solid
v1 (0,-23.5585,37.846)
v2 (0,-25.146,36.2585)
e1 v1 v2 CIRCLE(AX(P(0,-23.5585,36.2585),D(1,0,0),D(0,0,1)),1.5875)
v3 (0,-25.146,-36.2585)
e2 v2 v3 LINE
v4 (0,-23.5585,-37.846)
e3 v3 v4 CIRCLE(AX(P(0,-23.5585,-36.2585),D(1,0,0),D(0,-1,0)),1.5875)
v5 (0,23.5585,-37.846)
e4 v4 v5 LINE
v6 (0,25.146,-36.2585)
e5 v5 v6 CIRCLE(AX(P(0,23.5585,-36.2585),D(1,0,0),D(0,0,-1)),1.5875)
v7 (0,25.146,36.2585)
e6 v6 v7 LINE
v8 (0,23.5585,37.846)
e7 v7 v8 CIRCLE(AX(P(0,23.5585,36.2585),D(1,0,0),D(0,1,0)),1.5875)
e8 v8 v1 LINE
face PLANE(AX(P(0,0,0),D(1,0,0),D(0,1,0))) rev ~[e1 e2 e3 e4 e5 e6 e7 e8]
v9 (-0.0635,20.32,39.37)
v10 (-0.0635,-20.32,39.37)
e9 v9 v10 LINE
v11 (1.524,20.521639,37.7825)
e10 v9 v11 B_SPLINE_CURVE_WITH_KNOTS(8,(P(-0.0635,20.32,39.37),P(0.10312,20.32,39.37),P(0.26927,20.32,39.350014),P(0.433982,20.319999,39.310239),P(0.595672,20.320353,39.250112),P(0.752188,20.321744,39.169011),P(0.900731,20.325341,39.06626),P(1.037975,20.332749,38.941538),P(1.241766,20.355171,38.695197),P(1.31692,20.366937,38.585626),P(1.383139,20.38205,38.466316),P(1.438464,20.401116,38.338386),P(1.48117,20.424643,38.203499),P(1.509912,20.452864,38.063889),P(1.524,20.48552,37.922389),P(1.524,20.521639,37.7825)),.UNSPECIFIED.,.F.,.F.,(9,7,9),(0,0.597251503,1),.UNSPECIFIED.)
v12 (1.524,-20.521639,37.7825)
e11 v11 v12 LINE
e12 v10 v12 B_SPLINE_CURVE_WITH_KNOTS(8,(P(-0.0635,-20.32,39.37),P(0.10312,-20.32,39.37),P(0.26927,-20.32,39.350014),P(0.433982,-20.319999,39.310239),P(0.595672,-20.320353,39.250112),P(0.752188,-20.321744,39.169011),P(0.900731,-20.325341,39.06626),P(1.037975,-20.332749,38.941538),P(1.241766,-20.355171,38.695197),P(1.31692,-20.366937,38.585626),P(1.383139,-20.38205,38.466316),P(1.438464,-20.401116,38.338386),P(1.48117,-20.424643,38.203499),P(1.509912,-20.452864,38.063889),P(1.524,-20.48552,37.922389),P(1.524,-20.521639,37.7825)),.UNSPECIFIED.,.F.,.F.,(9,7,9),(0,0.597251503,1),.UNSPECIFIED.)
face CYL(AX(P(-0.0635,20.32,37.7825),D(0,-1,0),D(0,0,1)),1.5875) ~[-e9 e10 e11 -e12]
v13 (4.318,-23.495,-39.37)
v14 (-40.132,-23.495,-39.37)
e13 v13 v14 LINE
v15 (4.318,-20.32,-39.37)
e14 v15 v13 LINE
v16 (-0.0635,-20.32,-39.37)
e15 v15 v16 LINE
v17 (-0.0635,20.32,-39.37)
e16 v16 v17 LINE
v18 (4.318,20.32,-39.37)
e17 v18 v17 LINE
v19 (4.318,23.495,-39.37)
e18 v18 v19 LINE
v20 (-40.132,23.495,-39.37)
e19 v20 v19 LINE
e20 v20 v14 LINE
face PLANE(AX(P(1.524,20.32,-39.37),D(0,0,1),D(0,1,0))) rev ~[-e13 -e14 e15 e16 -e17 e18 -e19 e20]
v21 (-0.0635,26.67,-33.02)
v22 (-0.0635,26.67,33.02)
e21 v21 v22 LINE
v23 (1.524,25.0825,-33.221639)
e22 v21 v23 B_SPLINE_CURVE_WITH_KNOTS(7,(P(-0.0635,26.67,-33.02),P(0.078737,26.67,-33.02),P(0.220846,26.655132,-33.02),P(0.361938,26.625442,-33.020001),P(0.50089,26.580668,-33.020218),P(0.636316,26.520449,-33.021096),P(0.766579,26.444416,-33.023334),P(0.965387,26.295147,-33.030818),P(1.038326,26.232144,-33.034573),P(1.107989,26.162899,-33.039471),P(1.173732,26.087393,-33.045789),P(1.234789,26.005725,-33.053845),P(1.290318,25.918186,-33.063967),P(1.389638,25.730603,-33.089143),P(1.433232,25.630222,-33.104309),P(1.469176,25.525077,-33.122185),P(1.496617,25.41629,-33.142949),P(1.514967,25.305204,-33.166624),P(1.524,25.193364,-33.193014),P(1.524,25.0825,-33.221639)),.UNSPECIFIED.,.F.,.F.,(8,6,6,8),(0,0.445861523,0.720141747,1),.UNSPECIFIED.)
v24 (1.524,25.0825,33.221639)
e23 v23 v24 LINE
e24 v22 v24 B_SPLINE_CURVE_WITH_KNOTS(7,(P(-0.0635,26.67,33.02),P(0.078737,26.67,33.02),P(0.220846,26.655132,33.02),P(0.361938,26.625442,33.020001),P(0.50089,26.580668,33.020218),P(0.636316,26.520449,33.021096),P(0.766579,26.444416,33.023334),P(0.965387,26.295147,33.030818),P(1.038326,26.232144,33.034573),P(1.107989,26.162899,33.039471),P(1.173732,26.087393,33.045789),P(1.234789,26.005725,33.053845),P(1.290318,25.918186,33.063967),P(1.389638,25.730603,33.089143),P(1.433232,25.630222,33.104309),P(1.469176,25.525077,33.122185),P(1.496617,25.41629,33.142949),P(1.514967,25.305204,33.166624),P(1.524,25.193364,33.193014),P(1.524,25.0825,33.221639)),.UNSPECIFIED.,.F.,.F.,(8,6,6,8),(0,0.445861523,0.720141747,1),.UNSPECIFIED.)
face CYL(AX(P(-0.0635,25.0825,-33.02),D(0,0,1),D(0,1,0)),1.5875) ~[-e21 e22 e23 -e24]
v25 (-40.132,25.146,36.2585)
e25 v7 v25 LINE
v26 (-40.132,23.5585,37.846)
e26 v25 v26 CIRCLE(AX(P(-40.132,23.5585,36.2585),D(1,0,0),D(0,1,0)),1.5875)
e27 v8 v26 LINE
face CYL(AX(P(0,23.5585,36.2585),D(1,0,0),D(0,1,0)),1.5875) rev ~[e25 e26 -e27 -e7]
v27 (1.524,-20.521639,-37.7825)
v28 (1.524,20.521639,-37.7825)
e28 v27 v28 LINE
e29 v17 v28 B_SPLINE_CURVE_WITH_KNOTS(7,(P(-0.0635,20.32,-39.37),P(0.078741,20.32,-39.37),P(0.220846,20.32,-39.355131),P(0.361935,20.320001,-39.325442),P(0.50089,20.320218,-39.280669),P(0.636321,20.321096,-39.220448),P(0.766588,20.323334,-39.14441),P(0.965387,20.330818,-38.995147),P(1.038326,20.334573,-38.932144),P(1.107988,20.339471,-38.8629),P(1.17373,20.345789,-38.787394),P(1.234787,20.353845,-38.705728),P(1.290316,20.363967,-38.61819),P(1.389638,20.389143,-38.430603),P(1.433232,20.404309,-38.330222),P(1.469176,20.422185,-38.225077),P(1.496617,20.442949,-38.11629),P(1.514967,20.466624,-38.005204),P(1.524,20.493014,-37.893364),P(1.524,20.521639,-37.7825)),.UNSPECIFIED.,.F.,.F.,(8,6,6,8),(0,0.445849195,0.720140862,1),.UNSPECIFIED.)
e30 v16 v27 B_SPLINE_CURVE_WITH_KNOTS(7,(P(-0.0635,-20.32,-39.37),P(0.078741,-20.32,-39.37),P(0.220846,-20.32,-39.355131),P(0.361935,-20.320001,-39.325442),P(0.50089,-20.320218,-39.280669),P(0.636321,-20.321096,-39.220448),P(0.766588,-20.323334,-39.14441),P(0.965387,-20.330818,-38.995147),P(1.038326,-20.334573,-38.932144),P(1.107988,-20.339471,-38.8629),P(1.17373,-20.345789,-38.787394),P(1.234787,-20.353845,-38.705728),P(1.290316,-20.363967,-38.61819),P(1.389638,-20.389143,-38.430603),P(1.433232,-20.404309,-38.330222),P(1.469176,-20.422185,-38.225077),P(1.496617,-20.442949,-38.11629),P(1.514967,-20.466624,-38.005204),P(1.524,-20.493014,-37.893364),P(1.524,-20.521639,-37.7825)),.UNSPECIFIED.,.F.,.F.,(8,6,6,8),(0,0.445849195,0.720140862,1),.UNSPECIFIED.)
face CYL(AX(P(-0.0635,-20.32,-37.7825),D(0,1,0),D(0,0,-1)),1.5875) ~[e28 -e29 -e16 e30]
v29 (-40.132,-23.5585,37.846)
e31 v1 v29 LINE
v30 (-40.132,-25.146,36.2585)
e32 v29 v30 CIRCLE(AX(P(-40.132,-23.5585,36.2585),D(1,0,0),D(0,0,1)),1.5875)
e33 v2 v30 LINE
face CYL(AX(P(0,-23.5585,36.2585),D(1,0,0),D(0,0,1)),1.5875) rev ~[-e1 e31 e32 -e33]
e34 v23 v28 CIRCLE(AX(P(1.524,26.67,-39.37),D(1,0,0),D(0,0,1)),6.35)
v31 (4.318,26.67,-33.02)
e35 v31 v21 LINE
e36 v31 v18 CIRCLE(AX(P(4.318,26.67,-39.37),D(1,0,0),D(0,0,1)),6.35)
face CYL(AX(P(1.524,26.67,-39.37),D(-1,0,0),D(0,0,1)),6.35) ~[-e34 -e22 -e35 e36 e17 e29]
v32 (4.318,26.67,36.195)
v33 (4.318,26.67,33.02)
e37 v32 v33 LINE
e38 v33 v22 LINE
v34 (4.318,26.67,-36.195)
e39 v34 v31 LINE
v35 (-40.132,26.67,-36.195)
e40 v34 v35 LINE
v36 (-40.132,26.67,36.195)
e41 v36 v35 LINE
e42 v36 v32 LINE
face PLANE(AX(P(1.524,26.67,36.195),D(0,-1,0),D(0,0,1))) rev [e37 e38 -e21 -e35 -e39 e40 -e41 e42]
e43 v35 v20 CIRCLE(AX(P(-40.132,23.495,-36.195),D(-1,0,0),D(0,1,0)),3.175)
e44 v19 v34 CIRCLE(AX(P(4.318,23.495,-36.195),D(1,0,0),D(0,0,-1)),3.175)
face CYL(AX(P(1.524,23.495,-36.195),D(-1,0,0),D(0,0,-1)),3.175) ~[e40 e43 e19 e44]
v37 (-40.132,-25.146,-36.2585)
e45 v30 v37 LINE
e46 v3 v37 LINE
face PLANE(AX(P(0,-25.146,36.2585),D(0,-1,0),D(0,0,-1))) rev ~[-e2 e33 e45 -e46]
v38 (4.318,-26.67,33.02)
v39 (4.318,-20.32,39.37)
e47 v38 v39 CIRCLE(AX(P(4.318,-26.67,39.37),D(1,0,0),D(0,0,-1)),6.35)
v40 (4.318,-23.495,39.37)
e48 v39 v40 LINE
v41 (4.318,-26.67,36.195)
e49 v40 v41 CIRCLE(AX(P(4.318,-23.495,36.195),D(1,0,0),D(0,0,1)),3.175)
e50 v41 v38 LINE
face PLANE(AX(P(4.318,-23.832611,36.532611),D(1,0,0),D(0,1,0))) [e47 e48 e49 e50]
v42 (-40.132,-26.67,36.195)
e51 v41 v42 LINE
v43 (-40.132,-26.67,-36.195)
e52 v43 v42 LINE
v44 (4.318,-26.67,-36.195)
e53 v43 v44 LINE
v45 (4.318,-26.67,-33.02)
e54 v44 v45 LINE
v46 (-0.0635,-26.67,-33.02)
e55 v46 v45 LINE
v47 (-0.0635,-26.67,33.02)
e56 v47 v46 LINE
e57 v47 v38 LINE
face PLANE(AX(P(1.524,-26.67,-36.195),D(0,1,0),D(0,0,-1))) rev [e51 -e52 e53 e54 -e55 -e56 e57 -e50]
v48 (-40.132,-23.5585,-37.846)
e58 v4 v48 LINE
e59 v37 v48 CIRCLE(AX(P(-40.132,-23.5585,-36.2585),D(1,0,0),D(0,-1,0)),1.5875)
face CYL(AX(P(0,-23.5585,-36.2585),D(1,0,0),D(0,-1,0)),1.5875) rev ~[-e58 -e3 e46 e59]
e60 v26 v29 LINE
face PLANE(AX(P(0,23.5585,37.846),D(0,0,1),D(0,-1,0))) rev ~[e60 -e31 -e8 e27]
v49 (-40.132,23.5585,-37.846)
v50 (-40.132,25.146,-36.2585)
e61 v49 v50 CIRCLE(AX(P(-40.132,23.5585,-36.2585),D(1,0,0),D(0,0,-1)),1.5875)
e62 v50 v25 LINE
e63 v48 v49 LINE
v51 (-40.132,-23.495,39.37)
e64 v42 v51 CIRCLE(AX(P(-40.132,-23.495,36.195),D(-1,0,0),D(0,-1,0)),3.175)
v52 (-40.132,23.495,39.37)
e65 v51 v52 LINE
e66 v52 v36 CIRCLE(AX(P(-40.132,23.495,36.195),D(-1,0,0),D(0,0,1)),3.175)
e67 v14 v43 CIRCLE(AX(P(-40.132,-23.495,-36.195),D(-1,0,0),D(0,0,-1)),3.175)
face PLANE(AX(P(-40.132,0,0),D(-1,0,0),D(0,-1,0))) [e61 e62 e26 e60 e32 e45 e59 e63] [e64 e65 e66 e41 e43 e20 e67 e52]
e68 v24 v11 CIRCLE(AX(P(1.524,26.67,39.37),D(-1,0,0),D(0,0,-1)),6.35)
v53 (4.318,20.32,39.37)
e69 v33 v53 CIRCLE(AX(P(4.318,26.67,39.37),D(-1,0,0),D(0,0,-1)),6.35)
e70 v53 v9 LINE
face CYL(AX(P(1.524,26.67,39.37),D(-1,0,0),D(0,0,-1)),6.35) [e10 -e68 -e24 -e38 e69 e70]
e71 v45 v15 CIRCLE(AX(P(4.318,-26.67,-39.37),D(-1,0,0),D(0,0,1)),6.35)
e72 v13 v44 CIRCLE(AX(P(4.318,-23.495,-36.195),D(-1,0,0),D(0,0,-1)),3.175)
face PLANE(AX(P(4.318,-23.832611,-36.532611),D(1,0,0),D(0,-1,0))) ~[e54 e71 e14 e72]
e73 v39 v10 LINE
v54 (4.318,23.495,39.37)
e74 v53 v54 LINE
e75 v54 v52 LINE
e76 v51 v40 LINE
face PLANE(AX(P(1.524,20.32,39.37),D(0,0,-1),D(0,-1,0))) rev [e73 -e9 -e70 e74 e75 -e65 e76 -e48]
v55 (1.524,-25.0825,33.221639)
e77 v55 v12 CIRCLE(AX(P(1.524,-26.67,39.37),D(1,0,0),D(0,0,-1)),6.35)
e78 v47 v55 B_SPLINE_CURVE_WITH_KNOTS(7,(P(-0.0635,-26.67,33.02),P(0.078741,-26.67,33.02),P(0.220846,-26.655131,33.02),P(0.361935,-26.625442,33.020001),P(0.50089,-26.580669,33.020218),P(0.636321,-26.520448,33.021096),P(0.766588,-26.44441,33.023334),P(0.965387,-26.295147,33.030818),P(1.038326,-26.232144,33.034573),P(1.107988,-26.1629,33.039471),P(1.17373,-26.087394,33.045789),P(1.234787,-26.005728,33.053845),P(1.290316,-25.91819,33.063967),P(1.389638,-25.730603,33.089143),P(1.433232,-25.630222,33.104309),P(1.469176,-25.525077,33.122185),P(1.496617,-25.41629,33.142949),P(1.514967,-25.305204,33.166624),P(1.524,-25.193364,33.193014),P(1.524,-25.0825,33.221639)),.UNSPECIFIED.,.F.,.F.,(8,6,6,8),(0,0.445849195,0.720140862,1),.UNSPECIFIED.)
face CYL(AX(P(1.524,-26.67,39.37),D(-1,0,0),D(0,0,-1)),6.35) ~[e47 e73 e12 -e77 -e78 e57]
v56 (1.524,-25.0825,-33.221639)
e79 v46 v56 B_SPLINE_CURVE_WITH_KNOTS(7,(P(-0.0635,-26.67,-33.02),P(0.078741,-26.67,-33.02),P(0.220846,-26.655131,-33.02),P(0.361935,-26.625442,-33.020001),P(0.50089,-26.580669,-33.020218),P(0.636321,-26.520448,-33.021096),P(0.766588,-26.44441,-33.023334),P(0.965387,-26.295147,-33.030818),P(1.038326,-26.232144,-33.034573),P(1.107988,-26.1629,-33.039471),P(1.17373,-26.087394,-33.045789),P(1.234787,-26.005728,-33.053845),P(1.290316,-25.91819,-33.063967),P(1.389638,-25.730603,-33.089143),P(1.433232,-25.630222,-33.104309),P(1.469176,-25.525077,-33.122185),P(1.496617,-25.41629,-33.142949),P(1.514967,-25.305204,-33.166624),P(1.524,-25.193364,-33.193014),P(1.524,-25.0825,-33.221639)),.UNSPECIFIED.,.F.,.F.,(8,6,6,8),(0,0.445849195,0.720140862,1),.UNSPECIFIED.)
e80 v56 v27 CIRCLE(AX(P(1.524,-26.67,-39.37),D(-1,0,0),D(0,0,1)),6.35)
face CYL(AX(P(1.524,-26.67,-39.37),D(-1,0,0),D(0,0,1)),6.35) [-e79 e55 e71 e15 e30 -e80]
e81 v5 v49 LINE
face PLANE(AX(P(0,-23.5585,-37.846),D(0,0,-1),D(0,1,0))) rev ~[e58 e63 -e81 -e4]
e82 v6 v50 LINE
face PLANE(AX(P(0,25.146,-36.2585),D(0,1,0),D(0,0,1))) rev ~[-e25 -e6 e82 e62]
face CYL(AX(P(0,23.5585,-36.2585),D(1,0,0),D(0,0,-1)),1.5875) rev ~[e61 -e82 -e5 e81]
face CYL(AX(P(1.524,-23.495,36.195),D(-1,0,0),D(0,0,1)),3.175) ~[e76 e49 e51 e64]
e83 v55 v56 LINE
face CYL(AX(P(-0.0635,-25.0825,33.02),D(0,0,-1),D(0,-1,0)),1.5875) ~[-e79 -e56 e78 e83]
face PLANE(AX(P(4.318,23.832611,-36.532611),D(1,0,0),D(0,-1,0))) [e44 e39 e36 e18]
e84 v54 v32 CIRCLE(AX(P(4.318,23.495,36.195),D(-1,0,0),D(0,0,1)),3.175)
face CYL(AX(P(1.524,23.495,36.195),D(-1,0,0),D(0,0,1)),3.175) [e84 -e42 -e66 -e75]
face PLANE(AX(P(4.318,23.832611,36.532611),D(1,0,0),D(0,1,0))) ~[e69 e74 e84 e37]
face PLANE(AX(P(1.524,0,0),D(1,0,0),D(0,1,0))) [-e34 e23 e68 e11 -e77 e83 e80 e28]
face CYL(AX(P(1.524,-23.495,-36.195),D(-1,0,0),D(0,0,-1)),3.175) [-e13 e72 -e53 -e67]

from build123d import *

# Parameters (mm, degrees)
F1_DEPTH = 1.524
F3_DEPTH = 40.132
F5_DEPTH = 2.794
F8_R     = 1.5875
F9_R     = 1.5875
F10_R    = 1.5875
F11_R    = 1.5875


with BuildPart() as f1:
    # F0 (on Right) → F1 (new body)
    with BuildSketch(Plane.YZ):
        with BuildLine():
            ThreePointArc((26.67, 36.195), (25.7400640303, 38.4400640303), (23.495, 39.37))
            Line((23.495, 39.37), (-23.495, 39.37))
            ThreePointArc((-23.495, 39.37), (-25.7400640303, 38.4400640303), (-26.67, 36.195))
            Line((-26.67, 36.195), (-26.67, -36.195))
            ThreePointArc((-26.67, -36.195), (-25.7400640303, -38.4400640303), (-23.495, -39.37))
            Line((-23.495, -39.37), (23.495, -39.37))
            ThreePointArc((23.495, -39.37), (25.7400640303, -38.4400640303), (26.67, -36.195))
            Line((26.67, -36.195), (26.67, 36.195))
        make_face()
    extrude(amount=F1_DEPTH)

    # F2 (on face) → F3 (join)
    with BuildSketch(Plane(origin=(0, 0, 0), x_dir=(0, -1, 0), z_dir=(-1, 0, 0))):
        with BuildLine():
            Line((23.495, 39.37), (-23.495, 39.37))
            ThreePointArc((-23.495, 39.37), (-25.7400640303, 38.4400640303), (-26.67, 36.195))
            Line((-26.67, 36.195), (-26.67, -36.195))
            ThreePointArc((-26.67, -36.195), (-25.7400640303, -38.4400640303), (-23.495, -39.37))
            Line((-23.495, -39.37), (23.495, -39.37))
            ThreePointArc((23.495, -39.37), (25.7400640303, -38.4400640303), (26.67, -36.195))
            Line((26.67, -36.195), (26.67, 36.195))
            ThreePointArc((26.67, 36.195), (25.7400640303, 38.4400640303), (23.495, 39.37))
        make_face()
        with BuildLine():
            ThreePointArc((25.146, -36.2585), (24.6810320151, -37.3810320151), (23.5585, -37.846))
            Line((23.5585, -37.846), (-23.5585, -37.846))
            ThreePointArc((-23.5585, -37.846), (-24.6810320151, -37.3810320151), (-25.146, -36.2585))
            Line((-25.146, -36.2585), (-25.146, 36.2585))
            ThreePointArc((-25.146, 36.2585), (-24.6810320151, 37.3810320151), (-23.5585, 37.846))
            Line((-23.5585, 37.846), (23.5585, 37.846))
            ThreePointArc((23.5585, 37.846), (24.6810320151, 37.3810320151), (25.146, 36.2585))
            Line((25.146, 36.2585), (25.146, -36.2585))
        make_face(mode=Mode.SUBTRACT)
    extrude(amount=F3_DEPTH)

    # F4 (on face) → F5 (join)
    with BuildSketch(Plane.YZ.offset(1.524)):
        with BuildLine():
            ThreePointArc((-26.67, 33.02), (-22.1798719395, 34.8798719395), (-20.32, 39.37))
            Line((-20.32, 39.37), (-23.495, 39.37))
            ThreePointArc((-23.495, 39.37), (-25.7400640303, 38.4400640303), (-26.67, 36.195))
            Line((-26.67, 36.195), (-26.67, 33.02))
        make_face()
    extrude(amount=F5_DEPTH)


with BuildPart() as f6_1:
    # F6: instance of F1
    add(f1.part.mirror(Plane.XY))


with BuildPart() as f1_1:
    add(f1.part)

    add(f6_1.part)  # F7 merges F6_1
    # F7: F6_1, F1 across plane
    add(f6_1.part.mirror(Plane.XZ))
    add(f1.part.mirror(Plane.XZ))

    # F8
    f8_edges = [f1_1.edges().sort_by_distance(p)[0] for p in [
        (1.524, -26.67, 0),
    ]]
    fillet(f8_edges, radius=F8_R)

    # F9
    f9_edges = [f1_1.edges().sort_by_distance(p)[0] for p in [
        (1.524, 0, -39.37),
    ]]
    fillet(f9_edges, radius=F9_R)

    # F10
    f10_edges = [f1_1.edges().sort_by_distance(p)[0] for p in [
        (1.524, 26.67, 0),
    ]]
    fillet(f10_edges, radius=F10_R)

    # F11
    f11_edges = [f1_1.edges().sort_by_distance(p)[0] for p in [
        (1.524, 0, 39.37),
    ]]
    fillet(f11_edges, radius=F11_R)


solid = f1_1.part
